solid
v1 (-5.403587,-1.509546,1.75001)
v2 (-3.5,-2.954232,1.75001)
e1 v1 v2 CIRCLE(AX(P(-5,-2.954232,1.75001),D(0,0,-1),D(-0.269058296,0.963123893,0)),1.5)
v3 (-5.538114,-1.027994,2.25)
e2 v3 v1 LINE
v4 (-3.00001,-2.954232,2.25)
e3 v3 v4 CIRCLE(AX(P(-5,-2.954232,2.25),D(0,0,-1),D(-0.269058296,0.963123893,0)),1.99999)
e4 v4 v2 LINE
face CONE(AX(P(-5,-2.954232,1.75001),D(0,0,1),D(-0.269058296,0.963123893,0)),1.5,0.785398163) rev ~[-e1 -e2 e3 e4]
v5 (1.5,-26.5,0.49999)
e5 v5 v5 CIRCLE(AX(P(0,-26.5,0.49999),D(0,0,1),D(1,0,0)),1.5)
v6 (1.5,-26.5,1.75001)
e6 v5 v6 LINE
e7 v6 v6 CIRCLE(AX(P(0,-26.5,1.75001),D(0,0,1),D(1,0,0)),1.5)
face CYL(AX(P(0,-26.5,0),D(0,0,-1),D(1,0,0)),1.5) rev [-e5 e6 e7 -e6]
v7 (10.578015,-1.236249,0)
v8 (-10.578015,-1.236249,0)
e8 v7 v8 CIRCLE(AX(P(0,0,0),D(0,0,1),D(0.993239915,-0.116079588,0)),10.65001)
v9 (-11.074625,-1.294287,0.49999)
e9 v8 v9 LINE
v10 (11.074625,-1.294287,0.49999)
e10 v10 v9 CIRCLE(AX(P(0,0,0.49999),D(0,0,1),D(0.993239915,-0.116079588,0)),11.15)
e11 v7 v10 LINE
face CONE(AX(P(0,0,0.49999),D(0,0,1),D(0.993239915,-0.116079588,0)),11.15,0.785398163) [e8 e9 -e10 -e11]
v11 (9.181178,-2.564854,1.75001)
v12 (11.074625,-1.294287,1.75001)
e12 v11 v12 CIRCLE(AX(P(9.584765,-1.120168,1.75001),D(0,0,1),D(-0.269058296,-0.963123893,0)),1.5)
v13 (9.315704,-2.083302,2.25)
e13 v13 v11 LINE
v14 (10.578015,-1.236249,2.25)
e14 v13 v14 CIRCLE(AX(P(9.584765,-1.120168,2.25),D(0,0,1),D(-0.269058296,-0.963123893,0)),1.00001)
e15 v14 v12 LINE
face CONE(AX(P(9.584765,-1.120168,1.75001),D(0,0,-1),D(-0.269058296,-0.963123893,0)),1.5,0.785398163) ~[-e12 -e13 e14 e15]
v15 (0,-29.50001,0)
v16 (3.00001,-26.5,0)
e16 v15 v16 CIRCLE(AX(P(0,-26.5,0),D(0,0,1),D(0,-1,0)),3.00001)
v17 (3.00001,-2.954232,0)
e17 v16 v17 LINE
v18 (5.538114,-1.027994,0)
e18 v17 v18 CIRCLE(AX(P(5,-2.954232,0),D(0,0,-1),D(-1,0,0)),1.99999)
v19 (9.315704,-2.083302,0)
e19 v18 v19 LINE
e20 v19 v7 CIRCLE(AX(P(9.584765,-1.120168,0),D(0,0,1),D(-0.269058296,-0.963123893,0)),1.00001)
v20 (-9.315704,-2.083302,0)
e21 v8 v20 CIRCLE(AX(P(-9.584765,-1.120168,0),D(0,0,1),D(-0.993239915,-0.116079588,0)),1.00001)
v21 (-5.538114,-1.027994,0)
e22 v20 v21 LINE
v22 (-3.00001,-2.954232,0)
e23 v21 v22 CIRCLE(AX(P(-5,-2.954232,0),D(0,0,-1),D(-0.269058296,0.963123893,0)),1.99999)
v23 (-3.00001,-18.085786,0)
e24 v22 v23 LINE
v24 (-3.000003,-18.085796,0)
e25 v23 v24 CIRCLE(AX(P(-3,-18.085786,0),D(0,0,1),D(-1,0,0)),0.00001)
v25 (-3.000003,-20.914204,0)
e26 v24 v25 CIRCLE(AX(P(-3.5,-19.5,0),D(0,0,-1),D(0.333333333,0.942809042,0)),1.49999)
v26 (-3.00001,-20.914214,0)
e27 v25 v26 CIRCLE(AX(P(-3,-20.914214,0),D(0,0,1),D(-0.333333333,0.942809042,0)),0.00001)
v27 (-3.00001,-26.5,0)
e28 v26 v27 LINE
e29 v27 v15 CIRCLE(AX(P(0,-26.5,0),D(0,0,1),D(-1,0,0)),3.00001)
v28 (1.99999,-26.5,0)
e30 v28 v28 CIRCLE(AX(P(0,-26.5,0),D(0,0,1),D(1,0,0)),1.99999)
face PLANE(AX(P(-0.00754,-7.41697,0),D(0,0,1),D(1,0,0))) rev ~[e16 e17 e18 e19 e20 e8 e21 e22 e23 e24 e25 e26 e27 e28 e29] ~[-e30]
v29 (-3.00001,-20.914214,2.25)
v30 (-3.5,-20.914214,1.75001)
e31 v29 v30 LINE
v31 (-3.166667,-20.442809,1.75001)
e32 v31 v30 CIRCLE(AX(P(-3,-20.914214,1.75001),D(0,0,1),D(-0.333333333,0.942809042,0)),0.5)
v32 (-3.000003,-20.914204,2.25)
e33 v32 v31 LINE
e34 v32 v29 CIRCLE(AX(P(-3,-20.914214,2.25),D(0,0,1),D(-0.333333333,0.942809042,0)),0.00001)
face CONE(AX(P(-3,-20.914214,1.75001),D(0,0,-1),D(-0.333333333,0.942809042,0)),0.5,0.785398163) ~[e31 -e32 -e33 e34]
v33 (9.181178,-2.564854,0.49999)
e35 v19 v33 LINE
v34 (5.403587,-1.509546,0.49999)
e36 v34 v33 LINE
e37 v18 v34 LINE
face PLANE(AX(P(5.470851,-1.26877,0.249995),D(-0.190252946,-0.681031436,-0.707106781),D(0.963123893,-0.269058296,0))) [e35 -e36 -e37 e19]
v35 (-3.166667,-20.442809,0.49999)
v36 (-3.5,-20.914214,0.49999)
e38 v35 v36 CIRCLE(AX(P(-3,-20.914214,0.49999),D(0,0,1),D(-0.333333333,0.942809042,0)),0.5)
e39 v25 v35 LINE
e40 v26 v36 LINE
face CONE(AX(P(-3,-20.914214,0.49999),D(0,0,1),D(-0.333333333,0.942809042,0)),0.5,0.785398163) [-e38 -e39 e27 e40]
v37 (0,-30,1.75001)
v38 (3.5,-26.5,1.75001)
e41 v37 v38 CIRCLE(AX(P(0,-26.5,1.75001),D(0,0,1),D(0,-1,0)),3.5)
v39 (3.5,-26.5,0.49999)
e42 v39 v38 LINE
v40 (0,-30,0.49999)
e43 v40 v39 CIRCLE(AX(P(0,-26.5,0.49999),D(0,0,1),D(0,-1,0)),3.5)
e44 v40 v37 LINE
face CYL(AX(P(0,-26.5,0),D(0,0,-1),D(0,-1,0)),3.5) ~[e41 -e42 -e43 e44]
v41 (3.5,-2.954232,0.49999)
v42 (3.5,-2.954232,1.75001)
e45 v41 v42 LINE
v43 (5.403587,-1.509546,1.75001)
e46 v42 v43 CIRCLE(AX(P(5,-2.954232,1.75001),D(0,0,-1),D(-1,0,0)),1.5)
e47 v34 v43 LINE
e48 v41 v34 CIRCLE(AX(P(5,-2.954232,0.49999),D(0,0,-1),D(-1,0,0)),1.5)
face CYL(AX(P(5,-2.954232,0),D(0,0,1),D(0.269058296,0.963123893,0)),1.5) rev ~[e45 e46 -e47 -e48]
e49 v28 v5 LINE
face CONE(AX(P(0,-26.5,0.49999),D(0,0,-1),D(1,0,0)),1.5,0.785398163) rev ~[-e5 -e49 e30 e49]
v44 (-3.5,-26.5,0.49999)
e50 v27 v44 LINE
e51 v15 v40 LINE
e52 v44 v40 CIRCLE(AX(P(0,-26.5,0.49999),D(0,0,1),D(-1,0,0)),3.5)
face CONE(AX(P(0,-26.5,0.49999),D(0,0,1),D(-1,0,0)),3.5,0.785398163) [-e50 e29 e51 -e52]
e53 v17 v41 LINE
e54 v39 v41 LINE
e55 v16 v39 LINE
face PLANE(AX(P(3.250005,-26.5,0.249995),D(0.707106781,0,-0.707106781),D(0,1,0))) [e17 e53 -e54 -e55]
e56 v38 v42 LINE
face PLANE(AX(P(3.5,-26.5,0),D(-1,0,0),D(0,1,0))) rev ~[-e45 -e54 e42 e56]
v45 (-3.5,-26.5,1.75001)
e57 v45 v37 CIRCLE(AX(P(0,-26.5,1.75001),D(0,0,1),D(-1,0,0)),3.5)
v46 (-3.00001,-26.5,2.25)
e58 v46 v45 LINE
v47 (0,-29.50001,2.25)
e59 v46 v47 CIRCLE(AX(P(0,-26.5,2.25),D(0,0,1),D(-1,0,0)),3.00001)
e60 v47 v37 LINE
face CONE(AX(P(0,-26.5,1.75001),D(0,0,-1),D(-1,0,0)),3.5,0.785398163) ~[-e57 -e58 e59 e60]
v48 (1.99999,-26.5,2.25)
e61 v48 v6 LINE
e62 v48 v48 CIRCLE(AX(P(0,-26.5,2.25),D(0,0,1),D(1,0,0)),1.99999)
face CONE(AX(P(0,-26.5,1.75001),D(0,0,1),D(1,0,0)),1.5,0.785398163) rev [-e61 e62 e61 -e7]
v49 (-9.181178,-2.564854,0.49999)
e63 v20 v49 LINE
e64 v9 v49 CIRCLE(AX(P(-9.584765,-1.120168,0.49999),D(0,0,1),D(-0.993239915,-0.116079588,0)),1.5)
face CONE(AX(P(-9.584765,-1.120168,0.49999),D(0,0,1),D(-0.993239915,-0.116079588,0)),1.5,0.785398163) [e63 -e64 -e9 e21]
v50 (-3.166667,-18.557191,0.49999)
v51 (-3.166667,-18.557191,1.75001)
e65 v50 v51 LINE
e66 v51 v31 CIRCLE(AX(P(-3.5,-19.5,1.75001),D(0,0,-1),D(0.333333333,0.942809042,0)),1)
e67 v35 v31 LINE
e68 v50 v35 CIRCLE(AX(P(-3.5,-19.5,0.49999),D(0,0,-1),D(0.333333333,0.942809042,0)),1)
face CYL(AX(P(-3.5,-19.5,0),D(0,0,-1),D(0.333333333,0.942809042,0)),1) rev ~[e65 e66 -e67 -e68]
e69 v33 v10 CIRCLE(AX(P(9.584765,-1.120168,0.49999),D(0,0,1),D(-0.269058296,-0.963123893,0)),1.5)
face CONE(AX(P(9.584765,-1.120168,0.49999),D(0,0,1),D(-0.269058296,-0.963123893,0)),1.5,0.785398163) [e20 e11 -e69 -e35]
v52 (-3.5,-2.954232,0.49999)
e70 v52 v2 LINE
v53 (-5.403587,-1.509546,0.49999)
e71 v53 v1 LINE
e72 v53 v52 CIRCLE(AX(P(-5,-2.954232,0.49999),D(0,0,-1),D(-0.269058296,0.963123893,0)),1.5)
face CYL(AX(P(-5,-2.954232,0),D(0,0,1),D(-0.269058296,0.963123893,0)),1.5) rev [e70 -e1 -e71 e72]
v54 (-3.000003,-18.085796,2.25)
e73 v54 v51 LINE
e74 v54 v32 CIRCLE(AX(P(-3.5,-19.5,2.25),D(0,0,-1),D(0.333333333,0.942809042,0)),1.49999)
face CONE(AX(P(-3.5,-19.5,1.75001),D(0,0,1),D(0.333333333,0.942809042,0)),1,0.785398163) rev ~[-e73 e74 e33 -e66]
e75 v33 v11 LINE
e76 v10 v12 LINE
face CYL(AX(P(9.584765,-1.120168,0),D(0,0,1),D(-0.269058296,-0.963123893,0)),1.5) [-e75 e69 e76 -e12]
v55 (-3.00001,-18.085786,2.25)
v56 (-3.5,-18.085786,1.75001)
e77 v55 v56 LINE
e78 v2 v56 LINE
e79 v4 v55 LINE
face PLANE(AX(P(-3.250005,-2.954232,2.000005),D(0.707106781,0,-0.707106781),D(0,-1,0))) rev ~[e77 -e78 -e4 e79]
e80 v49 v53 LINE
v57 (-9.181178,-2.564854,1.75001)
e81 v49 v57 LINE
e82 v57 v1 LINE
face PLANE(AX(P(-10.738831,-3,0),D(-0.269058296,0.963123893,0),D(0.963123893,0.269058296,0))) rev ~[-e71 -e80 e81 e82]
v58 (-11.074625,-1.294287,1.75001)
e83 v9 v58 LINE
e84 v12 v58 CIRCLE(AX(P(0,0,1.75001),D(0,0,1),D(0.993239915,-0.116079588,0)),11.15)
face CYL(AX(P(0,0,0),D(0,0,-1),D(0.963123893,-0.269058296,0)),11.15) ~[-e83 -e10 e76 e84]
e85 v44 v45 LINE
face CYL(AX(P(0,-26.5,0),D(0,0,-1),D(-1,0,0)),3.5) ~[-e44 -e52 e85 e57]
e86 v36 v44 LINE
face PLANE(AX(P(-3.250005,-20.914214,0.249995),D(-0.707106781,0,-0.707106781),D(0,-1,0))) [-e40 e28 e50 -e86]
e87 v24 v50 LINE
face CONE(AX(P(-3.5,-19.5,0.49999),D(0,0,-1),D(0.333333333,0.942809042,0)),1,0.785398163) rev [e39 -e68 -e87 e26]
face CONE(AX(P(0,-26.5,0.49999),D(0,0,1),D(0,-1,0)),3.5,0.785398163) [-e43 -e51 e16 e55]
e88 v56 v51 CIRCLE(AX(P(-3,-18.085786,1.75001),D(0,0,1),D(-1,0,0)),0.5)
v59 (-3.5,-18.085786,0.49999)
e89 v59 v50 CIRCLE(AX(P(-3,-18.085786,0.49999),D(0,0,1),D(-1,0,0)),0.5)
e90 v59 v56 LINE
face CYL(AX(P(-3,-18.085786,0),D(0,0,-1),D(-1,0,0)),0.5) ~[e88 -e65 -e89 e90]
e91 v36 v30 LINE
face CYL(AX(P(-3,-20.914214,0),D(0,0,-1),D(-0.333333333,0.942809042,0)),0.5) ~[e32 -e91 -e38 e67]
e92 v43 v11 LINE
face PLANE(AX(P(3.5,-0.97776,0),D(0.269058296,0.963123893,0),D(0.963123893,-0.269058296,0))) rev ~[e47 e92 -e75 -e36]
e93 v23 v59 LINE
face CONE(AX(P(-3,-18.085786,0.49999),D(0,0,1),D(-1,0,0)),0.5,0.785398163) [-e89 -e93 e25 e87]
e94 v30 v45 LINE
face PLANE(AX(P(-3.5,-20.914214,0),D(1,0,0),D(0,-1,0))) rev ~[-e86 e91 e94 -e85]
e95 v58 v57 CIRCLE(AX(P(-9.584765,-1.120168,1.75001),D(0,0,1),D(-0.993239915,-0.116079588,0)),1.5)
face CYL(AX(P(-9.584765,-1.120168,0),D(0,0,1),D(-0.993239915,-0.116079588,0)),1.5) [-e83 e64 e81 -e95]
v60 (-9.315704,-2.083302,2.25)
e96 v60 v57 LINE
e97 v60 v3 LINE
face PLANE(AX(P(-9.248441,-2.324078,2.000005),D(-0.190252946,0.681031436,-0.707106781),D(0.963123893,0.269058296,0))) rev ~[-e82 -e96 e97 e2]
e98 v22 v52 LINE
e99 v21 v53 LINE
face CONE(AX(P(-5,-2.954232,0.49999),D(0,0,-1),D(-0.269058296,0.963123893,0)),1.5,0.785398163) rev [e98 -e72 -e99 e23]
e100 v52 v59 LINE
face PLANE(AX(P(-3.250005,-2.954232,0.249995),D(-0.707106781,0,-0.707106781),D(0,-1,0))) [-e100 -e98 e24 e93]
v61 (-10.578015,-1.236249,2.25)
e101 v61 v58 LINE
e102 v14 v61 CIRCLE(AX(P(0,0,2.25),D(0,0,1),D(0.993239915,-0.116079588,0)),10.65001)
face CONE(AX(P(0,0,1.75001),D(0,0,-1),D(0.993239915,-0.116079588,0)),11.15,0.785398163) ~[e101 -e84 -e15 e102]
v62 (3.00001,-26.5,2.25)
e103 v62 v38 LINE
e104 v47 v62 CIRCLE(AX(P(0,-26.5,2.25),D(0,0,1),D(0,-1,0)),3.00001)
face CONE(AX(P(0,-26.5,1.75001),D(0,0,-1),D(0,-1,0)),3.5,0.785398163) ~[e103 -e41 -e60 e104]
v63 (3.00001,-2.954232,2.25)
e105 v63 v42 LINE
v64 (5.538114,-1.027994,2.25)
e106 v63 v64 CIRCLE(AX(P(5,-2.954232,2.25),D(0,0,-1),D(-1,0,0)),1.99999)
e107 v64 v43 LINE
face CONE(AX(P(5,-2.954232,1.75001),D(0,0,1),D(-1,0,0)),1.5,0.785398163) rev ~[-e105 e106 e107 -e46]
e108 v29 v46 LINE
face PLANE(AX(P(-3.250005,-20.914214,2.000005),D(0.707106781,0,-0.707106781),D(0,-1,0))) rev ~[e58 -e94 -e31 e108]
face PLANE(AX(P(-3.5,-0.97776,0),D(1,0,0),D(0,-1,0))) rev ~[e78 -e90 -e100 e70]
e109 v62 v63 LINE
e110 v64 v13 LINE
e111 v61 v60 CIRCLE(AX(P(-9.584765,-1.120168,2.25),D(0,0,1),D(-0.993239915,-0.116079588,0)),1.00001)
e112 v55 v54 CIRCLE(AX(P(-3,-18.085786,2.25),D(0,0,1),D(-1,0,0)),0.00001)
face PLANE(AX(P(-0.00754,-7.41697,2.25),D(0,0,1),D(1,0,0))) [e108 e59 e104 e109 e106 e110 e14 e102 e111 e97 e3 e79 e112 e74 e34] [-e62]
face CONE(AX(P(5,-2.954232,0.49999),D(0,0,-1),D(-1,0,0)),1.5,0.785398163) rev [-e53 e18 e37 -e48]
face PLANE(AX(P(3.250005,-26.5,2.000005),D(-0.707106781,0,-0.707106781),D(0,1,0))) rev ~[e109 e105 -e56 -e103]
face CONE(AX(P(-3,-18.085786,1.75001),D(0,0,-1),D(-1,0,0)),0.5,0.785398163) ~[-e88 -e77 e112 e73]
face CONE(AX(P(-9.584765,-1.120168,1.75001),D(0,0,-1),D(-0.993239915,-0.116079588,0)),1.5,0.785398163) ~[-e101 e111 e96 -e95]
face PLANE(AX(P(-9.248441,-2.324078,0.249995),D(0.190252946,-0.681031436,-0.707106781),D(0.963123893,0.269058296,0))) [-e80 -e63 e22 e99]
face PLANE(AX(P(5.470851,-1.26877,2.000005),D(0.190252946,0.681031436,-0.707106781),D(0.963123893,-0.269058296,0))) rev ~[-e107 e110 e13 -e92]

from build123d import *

# Parameters (mm, degrees)
F0_R     = 1.5
F1_DEPTH = 2.25
F2_R     = 1.5
F3_SIZE  = 0.49999


# Not quite as in the source:
# - a fillet or chamfer is up to 0.001 mm smaller than in the source, because OpenCascade refuses the exact size


with BuildPart() as f1:
    # F0 (on Top) → F1 (new body)
    with BuildSketch(Plane.XY):
        with BuildLine():
            Line((3.5, -0.9777600189), (10.7388314076, -3))
            ThreePointArc((10.7388314076, -3), (0, 11.15), (-10.7388314076, -3))
            Line((-10.7388314076, -3), (-3.5, -0.9777600189))
            Line((-3.5, -0.9777600189), (-3.5, -18.0857864376))
            ThreePointArc((-3.5, -18.0857864376), (-3.4082482905, -18.3744615722), (-3.1666666667, -18.5571909584))
            ThreePointArc((-3.1666666667, -18.5571909584), (-2.5, -19.5), (-3.1666666667, -20.4428090416))
            ThreePointArc((-3.1666666667, -20.4428090416), (-3.4082482905, -20.6255384278), (-3.5, -20.9142135624))
            Line((-3.5, -20.9142135624), (-3.5, -26.5))
            ThreePointArc((-3.5, -26.5), (-2.4748737342, -28.9748737342), (0, -30))
            ThreePointArc((0, -30), (2.4748737342, -28.9748737342), (3.5, -26.5))
            Line((3.5, -26.5), (3.5, -0.9777600189))
        make_face()
        with Locations((0, -26.5)):
            Circle(F0_R, mode=Mode.SUBTRACT)
    extrude(amount=F1_DEPTH)

    # F2
    f2_edges = [f1.edges().sort_by_distance(p)[0] for p in [
        (10.738831, -3, 1.125),
        (-10.738831, -3, 1.125),
        (-3.5, -0.97776, 1.125),
        (3.5, -0.97776, 1.125),
    ]]
    fillet(f2_edges, radius=F2_R)

    # F3 (size 0.5 in the source; OpenCascade refuses exactly that, so slightly less here)
    f3_edges = [f1.edges().sort_by_distance(p)[0] for p in [
        (3.5, -14.727116, 2.25),
        (4.093187, -1.759372, 2.25),
        (0, -30, 2.25),
        (7.292383, -2.0372, 2.25),
        (-3.5, -23.707107, 2.25),
        (10.420577, -2.365727, 2.25),
        (-3.408248, -20.625538, 2.25),
        (0, 11.15, 2.25),
        (-2.5, -19.5, 2.25),
        (-10.420577, -2.365727, 2.25),
        (-3.408248, -18.374462, 2.25),
        (-7.292383, -2.0372, 2.25),
        (-3.5, -10.520009, 2.25),
        (-4.093187, -1.759372, 2.25),
        (-1.5, -26.5, 2.25),
        (3.5, -14.727116, 0),
        (4.093187, -1.759372, 0),
        (0, -30, 0),
        (7.292383, -2.0372, 0),
        (-3.5, -23.707107, 0),
        (10.420577, -2.365727, 0),
        (-3.408248, -20.625538, 0),
        (0, 11.15, 0),
        (-2.5, -19.5, 0),
        (-10.420577, -2.365727, 0),
        (-3.408248, -18.374462, 0),
        (-7.292383, -2.0372, 0),
        (-3.5, -10.520009, 0),
        (-4.093187, -1.759372, 0),
        (-1.5, -26.5, 0),
    ]]
    chamfer(f3_edges, length=F3_SIZE)


solid = f1.part
